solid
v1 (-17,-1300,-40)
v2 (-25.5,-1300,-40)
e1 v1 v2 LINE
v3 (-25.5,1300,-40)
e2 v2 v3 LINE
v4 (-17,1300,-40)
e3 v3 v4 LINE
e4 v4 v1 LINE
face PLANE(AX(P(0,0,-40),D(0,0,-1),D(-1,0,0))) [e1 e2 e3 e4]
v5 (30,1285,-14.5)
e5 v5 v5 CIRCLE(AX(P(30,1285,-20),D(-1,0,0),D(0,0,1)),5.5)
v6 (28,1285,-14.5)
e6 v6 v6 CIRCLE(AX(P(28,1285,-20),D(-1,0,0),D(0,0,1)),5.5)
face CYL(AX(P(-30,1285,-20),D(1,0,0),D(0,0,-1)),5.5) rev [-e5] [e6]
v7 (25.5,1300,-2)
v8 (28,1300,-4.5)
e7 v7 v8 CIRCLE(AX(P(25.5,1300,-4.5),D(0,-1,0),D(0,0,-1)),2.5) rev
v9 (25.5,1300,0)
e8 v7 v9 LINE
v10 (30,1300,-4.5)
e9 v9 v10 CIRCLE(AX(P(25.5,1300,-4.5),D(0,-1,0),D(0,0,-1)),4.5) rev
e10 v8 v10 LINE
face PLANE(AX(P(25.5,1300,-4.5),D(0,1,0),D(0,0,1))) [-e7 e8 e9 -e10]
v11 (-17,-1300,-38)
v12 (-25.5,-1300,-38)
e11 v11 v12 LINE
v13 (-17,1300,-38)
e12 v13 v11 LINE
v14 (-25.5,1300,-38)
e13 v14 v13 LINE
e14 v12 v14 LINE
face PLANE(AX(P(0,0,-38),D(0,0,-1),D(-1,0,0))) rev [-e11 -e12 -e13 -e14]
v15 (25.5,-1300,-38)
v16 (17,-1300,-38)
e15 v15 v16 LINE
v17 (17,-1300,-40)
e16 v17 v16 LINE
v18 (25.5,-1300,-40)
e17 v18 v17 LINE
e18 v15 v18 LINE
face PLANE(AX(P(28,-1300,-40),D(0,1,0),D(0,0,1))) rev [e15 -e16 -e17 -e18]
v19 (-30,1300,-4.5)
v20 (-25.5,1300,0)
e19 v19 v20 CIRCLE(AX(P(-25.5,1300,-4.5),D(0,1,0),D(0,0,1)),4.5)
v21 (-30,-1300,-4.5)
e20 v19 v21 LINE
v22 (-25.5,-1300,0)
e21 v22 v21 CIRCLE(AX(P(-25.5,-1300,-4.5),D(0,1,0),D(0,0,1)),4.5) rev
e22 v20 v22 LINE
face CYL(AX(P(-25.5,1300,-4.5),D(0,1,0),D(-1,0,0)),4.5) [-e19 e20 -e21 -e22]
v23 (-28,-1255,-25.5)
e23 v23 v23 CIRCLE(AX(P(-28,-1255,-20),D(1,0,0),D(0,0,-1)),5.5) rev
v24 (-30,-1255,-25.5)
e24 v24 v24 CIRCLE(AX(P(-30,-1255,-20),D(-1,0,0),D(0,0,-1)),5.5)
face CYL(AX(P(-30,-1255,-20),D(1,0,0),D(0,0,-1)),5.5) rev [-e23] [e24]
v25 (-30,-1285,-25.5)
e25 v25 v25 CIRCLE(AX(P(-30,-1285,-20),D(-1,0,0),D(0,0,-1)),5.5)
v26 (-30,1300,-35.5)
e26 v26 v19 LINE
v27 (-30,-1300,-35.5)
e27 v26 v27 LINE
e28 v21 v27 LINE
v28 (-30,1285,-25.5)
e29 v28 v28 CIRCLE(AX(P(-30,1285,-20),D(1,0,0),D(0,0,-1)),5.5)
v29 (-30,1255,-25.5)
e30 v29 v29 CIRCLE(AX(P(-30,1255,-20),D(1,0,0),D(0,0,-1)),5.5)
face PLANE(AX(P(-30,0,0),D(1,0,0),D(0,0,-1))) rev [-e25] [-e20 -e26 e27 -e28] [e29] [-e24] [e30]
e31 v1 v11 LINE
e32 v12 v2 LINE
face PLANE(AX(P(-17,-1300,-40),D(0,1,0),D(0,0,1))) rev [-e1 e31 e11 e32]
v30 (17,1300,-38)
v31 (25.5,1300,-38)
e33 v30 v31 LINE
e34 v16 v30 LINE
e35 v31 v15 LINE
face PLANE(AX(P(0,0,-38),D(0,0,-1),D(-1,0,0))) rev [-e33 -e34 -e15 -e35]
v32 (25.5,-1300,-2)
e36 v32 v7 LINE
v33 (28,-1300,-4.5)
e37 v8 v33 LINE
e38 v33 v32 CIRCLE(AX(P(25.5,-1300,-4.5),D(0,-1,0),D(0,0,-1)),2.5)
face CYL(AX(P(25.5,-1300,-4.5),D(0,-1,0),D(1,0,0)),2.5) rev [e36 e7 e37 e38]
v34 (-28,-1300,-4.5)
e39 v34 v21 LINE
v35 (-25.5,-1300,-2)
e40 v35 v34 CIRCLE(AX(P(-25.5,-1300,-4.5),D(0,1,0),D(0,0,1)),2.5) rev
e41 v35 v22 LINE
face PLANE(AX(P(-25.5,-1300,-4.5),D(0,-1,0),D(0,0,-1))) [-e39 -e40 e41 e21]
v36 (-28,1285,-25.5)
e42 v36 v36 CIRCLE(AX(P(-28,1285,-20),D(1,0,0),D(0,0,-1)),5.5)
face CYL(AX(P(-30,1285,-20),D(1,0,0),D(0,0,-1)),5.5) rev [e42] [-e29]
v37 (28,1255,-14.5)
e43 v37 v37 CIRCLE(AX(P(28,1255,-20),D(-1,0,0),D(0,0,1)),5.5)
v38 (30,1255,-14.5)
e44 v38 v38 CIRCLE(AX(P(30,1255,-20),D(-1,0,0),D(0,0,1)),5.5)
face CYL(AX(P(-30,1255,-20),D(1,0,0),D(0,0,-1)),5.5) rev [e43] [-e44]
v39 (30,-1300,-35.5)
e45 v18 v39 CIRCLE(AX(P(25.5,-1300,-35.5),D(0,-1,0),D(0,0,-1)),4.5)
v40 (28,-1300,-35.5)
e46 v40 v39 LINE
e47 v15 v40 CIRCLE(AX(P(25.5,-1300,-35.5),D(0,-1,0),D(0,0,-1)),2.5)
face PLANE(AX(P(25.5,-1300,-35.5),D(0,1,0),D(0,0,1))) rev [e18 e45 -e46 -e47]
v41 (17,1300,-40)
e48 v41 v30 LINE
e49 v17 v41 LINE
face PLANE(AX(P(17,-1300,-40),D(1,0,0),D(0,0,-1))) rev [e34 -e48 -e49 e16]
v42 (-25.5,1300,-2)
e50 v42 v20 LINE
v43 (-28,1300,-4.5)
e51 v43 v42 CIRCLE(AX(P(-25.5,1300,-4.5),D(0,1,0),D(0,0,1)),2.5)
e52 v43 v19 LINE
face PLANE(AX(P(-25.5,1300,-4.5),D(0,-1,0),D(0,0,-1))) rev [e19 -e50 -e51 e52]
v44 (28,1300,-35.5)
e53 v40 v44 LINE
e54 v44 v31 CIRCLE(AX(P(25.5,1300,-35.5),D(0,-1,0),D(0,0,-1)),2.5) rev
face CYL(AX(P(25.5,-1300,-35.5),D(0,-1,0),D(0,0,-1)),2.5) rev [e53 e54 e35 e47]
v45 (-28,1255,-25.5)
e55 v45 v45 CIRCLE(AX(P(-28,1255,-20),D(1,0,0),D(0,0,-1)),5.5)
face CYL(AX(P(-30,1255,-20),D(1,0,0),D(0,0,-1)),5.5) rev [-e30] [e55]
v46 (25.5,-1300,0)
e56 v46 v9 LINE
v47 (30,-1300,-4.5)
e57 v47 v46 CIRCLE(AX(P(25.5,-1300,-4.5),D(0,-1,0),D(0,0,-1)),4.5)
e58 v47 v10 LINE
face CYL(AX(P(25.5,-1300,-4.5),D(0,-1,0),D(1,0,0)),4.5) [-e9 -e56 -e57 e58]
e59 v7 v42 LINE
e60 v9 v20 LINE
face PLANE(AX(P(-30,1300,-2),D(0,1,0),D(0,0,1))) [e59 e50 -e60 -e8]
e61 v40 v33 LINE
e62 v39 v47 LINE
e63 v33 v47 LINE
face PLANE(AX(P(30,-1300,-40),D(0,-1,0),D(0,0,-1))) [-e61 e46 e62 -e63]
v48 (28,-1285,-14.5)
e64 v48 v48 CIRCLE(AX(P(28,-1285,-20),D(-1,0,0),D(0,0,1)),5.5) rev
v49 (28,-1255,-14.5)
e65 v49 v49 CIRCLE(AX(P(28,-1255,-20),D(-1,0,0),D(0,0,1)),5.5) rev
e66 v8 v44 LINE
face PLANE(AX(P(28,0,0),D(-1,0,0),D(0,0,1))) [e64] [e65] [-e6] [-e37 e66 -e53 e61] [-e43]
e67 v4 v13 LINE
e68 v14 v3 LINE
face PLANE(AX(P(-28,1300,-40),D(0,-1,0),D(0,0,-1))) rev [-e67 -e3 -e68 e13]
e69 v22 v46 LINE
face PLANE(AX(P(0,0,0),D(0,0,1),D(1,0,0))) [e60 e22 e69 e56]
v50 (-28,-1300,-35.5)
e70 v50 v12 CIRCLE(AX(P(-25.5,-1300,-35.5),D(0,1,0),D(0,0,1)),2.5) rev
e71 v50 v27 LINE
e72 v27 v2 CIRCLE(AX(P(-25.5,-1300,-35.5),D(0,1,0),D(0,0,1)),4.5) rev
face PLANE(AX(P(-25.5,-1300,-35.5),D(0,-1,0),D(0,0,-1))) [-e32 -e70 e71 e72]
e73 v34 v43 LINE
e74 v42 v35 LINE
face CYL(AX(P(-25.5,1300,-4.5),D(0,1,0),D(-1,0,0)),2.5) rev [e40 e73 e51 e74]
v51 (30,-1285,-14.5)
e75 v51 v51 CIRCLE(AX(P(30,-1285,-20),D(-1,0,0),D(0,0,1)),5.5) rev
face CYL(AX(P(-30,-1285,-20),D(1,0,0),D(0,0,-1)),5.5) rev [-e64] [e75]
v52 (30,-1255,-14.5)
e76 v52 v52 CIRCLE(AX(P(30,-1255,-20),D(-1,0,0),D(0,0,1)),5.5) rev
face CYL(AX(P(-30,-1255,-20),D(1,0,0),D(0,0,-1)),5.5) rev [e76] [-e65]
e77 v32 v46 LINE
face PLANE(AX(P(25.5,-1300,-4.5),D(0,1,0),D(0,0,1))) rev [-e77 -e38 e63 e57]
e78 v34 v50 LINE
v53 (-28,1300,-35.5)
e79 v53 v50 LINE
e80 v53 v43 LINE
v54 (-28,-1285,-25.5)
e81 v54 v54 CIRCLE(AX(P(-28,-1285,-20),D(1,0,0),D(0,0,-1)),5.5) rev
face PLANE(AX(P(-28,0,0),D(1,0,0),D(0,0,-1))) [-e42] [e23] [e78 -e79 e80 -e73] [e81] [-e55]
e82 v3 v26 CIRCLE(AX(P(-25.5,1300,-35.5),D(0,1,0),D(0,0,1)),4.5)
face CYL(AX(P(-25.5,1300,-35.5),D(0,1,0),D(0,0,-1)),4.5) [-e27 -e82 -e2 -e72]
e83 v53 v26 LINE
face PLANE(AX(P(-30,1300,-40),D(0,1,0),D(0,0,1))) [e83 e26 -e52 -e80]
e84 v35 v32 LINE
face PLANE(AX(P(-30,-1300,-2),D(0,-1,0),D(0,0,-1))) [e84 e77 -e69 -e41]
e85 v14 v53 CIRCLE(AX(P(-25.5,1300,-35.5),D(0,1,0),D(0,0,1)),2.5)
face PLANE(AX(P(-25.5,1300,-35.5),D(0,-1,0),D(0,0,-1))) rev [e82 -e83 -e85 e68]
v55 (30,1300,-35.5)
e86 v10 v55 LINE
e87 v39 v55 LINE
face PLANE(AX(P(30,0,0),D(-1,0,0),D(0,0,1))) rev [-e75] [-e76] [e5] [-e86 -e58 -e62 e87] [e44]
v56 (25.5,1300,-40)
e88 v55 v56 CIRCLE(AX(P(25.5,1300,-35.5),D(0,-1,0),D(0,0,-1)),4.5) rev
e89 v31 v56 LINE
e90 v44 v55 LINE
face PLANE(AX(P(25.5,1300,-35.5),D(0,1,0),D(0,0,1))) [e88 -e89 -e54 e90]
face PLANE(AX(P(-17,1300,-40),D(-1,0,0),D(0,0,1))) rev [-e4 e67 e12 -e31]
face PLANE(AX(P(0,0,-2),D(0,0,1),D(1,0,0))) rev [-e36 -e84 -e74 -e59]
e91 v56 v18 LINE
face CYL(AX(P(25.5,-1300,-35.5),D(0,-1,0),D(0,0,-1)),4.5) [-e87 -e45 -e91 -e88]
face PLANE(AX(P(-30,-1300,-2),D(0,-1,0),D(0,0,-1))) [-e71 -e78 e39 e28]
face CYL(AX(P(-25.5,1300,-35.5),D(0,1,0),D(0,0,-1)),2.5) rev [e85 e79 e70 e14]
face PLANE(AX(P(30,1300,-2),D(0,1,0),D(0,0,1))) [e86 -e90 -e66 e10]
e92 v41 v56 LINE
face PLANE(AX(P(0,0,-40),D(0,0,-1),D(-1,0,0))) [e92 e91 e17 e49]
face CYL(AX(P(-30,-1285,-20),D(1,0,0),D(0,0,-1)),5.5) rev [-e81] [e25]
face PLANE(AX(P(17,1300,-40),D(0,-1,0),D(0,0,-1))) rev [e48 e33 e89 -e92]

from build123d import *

# Parameters (mm, degrees)
SKETCH1_W                      = 60
SKETCH1_H                      = 2600
BASE_FLANGE1_DEPTH             = 2
EDGE_FLANGE1_STRIP_W           = 13
EDGE_FLANGE1_STRIP_H           = 2
EDGE_FLANGE1_STRIP_CUT_DEPTH   = 2600
EDGE_FLANGE1_STRIP_2_W         = 13
EDGE_FLANGE1_STRIP_2_H         = 2
EDGE_FLANGE1_STRIP_CUT_2_DEPTH = 2600
EDGE_FLANGE1_DEPTH             = 2600
EDGE_FLANGE1_BEND_DEPTH        = 2600
EDGE_FLANGE2_STRIP_W           = 13
EDGE_FLANGE2_STRIP_H           = 2
EDGE_FLANGE2_STRIP_CUT_DEPTH   = 2600
EDGE_FLANGE2_STRIP_2_W         = 13
EDGE_FLANGE2_STRIP_2_H         = 2
EDGE_FLANGE2_STRIP_CUT_2_DEPTH = 2600
EDGE_FLANGE2_DEPTH             = 2600
EDGE_FLANGE2_BEND_DEPTH        = 2600
SKETCH18_R                     = 5.5
CUT_EXTRUDE1_DEPTH             = 1302.998463901


# Sheet-metal steps are written as plain solids
with BuildPart() as part:
    # Sketch1 → Base-Flange1 (new body)
    with BuildSketch(Plane.XY):
        Rectangle(SKETCH1_W, SKETCH1_H)
    extrude(amount=-BASE_FLANGE1_DEPTH)

    # Edge-Flange1 strip (across the edge) → Edge-Flange1 strip cut (cut)
    with BuildSketch(Plane(origin=(30, 1300, -2), x_dir=(-1, 0, 0), z_dir=(0, -1, 0))):
        with Locations((-2, -1)):
            Rectangle(EDGE_FLANGE1_STRIP_W, EDGE_FLANGE1_STRIP_H)
    extrude(amount=EDGE_FLANGE1_STRIP_CUT_DEPTH, mode=Mode.SUBTRACT)

    # Edge-Flange1 strip 2 (across the edge) → Edge-Flange1 strip cut 2 (cut)
    with BuildSketch(Plane(origin=(-30, -1300, -2), x_dir=(1, 0, 0), z_dir=(0, 1, 0))):
        with Locations((-2, -1)):
            Rectangle(EDGE_FLANGE1_STRIP_2_W, EDGE_FLANGE1_STRIP_2_H)
    extrude(amount=EDGE_FLANGE1_STRIP_CUT_2_DEPTH, mode=Mode.SUBTRACT)

    # Edge-Flange1 section (across the edge) → Edge-Flange1 (add)
    with BuildSketch(Plane(origin=(30, 1300, -2), x_dir=(-1, 0, 0), z_dir=(0, -1, 0))):
        with BuildLine():
            Line((0, 2.5), (0, 38))
            Line((0, 38), (2, 38))
            Line((2, 38), (2, 2.5))
            ThreePointArc((2, 2.5), (2.732233047, 0.732233047), (4.5, 0))
            Line((4.5, 0), (4.5, -2))
            ThreePointArc((4.5, -2), (1.318019485, -0.681980515), (0, 2.5))
        make_face()
    extrude(amount=EDGE_FLANGE1_DEPTH)

    # Edge-Flange1 section 2 (across the edge) → Edge-Flange1 bend (add)
    with BuildSketch(Plane(origin=(-30, -1300, -2), x_dir=(1, 0, 0), z_dir=(0, 1, 0))):
        with BuildLine():
            Line((0, 2.5), (0, 38))
            Line((0, 38), (2, 38))
            Line((2, 38), (2, 2.5))
            ThreePointArc((2, 2.5), (2.732233047, 0.732233047), (4.5, 0))
            Line((4.5, 0), (4.5, -2))
            ThreePointArc((4.5, -2), (1.318019485, -0.681980515), (0, 2.5))
        make_face()
    extrude(amount=EDGE_FLANGE1_BEND_DEPTH)

    # Edge-Flange2 strip (across the edge) → Edge-Flange2 strip cut (cut)
    with BuildSketch(Plane(origin=(28, 1300, -40), x_dir=(0, 0, 1), z_dir=(0, -1, 0))):
        with Locations((-2, -1)):
            Rectangle(EDGE_FLANGE2_STRIP_W, EDGE_FLANGE2_STRIP_H)
    extrude(amount=EDGE_FLANGE2_STRIP_CUT_DEPTH, mode=Mode.SUBTRACT)

    # Edge-Flange2 strip 2 (across the edge) → Edge-Flange2 strip cut 2 (cut)
    with BuildSketch(Plane(origin=(-28, -1300, -40), x_dir=(0, 0, 1), z_dir=(0, 1, 0))):
        with Locations((-2, -1)):
            Rectangle(EDGE_FLANGE2_STRIP_2_W, EDGE_FLANGE2_STRIP_2_H)
    extrude(amount=EDGE_FLANGE2_STRIP_CUT_2_DEPTH, mode=Mode.SUBTRACT)

    # Edge-Flange2 section (across the edge) → Edge-Flange2 (add)
    with BuildSketch(Plane(origin=(28, 1300, -40), x_dir=(0, 0, 1), z_dir=(0, -1, 0))):
        with BuildLine():
            Line((0, 2.5), (0, 11))
            Line((0, 11), (2, 11))
            Line((2, 11), (2, 2.5))
            ThreePointArc((2, 2.5), (2.732233047, 0.732233047), (4.5, 0))
            Line((4.5, 0), (4.5, -2))
            ThreePointArc((4.5, -2), (1.318019485, -0.681980515), (0, 2.5))
        make_face()
    extrude(amount=EDGE_FLANGE2_DEPTH)

    # Edge-Flange2 section 2 (across the edge) → Edge-Flange2 bend (add)
    with BuildSketch(Plane(origin=(-28, -1300, -40), x_dir=(0, 0, 1), z_dir=(0, 1, 0))):
        with BuildLine():
            Line((0, 2.5), (0, 11))
            Line((0, 11), (2, 11))
            Line((2, 11), (2, 2.5))
            ThreePointArc((2, 2.5), (2.732233047, 0.732233047), (4.5, 0))
            Line((4.5, 0), (4.5, -2))
            ThreePointArc((4.5, -2), (1.318019485, -0.681980515), (0, 2.5))
        make_face()
    extrude(amount=EDGE_FLANGE2_BEND_DEPTH)

    # Sketch18 → Cut-Extrude1 (cut, symmetric)
    with BuildSketch(Plane(origin=(30, 0, 0), x_dir=(0, 0, -1), z_dir=(1, 0, 0))):
        with Locations(Location((20, 1255, 0), (0, 0, 180))):
            Circle(SKETCH18_R)
        with Locations(Location((20, 1285, 0), (0, 0, 180))):
            Circle(SKETCH18_R)
    cut_extrude1 = extrude(amount=CUT_EXTRUDE1_DEPTH, both=True, mode=Mode.SUBTRACT)

    # Mirror1: Cut-Extrude1 across plane
    add(cut_extrude1.mirror(Plane.ZX), mode=Mode.SUBTRACT)


solid = part.part
